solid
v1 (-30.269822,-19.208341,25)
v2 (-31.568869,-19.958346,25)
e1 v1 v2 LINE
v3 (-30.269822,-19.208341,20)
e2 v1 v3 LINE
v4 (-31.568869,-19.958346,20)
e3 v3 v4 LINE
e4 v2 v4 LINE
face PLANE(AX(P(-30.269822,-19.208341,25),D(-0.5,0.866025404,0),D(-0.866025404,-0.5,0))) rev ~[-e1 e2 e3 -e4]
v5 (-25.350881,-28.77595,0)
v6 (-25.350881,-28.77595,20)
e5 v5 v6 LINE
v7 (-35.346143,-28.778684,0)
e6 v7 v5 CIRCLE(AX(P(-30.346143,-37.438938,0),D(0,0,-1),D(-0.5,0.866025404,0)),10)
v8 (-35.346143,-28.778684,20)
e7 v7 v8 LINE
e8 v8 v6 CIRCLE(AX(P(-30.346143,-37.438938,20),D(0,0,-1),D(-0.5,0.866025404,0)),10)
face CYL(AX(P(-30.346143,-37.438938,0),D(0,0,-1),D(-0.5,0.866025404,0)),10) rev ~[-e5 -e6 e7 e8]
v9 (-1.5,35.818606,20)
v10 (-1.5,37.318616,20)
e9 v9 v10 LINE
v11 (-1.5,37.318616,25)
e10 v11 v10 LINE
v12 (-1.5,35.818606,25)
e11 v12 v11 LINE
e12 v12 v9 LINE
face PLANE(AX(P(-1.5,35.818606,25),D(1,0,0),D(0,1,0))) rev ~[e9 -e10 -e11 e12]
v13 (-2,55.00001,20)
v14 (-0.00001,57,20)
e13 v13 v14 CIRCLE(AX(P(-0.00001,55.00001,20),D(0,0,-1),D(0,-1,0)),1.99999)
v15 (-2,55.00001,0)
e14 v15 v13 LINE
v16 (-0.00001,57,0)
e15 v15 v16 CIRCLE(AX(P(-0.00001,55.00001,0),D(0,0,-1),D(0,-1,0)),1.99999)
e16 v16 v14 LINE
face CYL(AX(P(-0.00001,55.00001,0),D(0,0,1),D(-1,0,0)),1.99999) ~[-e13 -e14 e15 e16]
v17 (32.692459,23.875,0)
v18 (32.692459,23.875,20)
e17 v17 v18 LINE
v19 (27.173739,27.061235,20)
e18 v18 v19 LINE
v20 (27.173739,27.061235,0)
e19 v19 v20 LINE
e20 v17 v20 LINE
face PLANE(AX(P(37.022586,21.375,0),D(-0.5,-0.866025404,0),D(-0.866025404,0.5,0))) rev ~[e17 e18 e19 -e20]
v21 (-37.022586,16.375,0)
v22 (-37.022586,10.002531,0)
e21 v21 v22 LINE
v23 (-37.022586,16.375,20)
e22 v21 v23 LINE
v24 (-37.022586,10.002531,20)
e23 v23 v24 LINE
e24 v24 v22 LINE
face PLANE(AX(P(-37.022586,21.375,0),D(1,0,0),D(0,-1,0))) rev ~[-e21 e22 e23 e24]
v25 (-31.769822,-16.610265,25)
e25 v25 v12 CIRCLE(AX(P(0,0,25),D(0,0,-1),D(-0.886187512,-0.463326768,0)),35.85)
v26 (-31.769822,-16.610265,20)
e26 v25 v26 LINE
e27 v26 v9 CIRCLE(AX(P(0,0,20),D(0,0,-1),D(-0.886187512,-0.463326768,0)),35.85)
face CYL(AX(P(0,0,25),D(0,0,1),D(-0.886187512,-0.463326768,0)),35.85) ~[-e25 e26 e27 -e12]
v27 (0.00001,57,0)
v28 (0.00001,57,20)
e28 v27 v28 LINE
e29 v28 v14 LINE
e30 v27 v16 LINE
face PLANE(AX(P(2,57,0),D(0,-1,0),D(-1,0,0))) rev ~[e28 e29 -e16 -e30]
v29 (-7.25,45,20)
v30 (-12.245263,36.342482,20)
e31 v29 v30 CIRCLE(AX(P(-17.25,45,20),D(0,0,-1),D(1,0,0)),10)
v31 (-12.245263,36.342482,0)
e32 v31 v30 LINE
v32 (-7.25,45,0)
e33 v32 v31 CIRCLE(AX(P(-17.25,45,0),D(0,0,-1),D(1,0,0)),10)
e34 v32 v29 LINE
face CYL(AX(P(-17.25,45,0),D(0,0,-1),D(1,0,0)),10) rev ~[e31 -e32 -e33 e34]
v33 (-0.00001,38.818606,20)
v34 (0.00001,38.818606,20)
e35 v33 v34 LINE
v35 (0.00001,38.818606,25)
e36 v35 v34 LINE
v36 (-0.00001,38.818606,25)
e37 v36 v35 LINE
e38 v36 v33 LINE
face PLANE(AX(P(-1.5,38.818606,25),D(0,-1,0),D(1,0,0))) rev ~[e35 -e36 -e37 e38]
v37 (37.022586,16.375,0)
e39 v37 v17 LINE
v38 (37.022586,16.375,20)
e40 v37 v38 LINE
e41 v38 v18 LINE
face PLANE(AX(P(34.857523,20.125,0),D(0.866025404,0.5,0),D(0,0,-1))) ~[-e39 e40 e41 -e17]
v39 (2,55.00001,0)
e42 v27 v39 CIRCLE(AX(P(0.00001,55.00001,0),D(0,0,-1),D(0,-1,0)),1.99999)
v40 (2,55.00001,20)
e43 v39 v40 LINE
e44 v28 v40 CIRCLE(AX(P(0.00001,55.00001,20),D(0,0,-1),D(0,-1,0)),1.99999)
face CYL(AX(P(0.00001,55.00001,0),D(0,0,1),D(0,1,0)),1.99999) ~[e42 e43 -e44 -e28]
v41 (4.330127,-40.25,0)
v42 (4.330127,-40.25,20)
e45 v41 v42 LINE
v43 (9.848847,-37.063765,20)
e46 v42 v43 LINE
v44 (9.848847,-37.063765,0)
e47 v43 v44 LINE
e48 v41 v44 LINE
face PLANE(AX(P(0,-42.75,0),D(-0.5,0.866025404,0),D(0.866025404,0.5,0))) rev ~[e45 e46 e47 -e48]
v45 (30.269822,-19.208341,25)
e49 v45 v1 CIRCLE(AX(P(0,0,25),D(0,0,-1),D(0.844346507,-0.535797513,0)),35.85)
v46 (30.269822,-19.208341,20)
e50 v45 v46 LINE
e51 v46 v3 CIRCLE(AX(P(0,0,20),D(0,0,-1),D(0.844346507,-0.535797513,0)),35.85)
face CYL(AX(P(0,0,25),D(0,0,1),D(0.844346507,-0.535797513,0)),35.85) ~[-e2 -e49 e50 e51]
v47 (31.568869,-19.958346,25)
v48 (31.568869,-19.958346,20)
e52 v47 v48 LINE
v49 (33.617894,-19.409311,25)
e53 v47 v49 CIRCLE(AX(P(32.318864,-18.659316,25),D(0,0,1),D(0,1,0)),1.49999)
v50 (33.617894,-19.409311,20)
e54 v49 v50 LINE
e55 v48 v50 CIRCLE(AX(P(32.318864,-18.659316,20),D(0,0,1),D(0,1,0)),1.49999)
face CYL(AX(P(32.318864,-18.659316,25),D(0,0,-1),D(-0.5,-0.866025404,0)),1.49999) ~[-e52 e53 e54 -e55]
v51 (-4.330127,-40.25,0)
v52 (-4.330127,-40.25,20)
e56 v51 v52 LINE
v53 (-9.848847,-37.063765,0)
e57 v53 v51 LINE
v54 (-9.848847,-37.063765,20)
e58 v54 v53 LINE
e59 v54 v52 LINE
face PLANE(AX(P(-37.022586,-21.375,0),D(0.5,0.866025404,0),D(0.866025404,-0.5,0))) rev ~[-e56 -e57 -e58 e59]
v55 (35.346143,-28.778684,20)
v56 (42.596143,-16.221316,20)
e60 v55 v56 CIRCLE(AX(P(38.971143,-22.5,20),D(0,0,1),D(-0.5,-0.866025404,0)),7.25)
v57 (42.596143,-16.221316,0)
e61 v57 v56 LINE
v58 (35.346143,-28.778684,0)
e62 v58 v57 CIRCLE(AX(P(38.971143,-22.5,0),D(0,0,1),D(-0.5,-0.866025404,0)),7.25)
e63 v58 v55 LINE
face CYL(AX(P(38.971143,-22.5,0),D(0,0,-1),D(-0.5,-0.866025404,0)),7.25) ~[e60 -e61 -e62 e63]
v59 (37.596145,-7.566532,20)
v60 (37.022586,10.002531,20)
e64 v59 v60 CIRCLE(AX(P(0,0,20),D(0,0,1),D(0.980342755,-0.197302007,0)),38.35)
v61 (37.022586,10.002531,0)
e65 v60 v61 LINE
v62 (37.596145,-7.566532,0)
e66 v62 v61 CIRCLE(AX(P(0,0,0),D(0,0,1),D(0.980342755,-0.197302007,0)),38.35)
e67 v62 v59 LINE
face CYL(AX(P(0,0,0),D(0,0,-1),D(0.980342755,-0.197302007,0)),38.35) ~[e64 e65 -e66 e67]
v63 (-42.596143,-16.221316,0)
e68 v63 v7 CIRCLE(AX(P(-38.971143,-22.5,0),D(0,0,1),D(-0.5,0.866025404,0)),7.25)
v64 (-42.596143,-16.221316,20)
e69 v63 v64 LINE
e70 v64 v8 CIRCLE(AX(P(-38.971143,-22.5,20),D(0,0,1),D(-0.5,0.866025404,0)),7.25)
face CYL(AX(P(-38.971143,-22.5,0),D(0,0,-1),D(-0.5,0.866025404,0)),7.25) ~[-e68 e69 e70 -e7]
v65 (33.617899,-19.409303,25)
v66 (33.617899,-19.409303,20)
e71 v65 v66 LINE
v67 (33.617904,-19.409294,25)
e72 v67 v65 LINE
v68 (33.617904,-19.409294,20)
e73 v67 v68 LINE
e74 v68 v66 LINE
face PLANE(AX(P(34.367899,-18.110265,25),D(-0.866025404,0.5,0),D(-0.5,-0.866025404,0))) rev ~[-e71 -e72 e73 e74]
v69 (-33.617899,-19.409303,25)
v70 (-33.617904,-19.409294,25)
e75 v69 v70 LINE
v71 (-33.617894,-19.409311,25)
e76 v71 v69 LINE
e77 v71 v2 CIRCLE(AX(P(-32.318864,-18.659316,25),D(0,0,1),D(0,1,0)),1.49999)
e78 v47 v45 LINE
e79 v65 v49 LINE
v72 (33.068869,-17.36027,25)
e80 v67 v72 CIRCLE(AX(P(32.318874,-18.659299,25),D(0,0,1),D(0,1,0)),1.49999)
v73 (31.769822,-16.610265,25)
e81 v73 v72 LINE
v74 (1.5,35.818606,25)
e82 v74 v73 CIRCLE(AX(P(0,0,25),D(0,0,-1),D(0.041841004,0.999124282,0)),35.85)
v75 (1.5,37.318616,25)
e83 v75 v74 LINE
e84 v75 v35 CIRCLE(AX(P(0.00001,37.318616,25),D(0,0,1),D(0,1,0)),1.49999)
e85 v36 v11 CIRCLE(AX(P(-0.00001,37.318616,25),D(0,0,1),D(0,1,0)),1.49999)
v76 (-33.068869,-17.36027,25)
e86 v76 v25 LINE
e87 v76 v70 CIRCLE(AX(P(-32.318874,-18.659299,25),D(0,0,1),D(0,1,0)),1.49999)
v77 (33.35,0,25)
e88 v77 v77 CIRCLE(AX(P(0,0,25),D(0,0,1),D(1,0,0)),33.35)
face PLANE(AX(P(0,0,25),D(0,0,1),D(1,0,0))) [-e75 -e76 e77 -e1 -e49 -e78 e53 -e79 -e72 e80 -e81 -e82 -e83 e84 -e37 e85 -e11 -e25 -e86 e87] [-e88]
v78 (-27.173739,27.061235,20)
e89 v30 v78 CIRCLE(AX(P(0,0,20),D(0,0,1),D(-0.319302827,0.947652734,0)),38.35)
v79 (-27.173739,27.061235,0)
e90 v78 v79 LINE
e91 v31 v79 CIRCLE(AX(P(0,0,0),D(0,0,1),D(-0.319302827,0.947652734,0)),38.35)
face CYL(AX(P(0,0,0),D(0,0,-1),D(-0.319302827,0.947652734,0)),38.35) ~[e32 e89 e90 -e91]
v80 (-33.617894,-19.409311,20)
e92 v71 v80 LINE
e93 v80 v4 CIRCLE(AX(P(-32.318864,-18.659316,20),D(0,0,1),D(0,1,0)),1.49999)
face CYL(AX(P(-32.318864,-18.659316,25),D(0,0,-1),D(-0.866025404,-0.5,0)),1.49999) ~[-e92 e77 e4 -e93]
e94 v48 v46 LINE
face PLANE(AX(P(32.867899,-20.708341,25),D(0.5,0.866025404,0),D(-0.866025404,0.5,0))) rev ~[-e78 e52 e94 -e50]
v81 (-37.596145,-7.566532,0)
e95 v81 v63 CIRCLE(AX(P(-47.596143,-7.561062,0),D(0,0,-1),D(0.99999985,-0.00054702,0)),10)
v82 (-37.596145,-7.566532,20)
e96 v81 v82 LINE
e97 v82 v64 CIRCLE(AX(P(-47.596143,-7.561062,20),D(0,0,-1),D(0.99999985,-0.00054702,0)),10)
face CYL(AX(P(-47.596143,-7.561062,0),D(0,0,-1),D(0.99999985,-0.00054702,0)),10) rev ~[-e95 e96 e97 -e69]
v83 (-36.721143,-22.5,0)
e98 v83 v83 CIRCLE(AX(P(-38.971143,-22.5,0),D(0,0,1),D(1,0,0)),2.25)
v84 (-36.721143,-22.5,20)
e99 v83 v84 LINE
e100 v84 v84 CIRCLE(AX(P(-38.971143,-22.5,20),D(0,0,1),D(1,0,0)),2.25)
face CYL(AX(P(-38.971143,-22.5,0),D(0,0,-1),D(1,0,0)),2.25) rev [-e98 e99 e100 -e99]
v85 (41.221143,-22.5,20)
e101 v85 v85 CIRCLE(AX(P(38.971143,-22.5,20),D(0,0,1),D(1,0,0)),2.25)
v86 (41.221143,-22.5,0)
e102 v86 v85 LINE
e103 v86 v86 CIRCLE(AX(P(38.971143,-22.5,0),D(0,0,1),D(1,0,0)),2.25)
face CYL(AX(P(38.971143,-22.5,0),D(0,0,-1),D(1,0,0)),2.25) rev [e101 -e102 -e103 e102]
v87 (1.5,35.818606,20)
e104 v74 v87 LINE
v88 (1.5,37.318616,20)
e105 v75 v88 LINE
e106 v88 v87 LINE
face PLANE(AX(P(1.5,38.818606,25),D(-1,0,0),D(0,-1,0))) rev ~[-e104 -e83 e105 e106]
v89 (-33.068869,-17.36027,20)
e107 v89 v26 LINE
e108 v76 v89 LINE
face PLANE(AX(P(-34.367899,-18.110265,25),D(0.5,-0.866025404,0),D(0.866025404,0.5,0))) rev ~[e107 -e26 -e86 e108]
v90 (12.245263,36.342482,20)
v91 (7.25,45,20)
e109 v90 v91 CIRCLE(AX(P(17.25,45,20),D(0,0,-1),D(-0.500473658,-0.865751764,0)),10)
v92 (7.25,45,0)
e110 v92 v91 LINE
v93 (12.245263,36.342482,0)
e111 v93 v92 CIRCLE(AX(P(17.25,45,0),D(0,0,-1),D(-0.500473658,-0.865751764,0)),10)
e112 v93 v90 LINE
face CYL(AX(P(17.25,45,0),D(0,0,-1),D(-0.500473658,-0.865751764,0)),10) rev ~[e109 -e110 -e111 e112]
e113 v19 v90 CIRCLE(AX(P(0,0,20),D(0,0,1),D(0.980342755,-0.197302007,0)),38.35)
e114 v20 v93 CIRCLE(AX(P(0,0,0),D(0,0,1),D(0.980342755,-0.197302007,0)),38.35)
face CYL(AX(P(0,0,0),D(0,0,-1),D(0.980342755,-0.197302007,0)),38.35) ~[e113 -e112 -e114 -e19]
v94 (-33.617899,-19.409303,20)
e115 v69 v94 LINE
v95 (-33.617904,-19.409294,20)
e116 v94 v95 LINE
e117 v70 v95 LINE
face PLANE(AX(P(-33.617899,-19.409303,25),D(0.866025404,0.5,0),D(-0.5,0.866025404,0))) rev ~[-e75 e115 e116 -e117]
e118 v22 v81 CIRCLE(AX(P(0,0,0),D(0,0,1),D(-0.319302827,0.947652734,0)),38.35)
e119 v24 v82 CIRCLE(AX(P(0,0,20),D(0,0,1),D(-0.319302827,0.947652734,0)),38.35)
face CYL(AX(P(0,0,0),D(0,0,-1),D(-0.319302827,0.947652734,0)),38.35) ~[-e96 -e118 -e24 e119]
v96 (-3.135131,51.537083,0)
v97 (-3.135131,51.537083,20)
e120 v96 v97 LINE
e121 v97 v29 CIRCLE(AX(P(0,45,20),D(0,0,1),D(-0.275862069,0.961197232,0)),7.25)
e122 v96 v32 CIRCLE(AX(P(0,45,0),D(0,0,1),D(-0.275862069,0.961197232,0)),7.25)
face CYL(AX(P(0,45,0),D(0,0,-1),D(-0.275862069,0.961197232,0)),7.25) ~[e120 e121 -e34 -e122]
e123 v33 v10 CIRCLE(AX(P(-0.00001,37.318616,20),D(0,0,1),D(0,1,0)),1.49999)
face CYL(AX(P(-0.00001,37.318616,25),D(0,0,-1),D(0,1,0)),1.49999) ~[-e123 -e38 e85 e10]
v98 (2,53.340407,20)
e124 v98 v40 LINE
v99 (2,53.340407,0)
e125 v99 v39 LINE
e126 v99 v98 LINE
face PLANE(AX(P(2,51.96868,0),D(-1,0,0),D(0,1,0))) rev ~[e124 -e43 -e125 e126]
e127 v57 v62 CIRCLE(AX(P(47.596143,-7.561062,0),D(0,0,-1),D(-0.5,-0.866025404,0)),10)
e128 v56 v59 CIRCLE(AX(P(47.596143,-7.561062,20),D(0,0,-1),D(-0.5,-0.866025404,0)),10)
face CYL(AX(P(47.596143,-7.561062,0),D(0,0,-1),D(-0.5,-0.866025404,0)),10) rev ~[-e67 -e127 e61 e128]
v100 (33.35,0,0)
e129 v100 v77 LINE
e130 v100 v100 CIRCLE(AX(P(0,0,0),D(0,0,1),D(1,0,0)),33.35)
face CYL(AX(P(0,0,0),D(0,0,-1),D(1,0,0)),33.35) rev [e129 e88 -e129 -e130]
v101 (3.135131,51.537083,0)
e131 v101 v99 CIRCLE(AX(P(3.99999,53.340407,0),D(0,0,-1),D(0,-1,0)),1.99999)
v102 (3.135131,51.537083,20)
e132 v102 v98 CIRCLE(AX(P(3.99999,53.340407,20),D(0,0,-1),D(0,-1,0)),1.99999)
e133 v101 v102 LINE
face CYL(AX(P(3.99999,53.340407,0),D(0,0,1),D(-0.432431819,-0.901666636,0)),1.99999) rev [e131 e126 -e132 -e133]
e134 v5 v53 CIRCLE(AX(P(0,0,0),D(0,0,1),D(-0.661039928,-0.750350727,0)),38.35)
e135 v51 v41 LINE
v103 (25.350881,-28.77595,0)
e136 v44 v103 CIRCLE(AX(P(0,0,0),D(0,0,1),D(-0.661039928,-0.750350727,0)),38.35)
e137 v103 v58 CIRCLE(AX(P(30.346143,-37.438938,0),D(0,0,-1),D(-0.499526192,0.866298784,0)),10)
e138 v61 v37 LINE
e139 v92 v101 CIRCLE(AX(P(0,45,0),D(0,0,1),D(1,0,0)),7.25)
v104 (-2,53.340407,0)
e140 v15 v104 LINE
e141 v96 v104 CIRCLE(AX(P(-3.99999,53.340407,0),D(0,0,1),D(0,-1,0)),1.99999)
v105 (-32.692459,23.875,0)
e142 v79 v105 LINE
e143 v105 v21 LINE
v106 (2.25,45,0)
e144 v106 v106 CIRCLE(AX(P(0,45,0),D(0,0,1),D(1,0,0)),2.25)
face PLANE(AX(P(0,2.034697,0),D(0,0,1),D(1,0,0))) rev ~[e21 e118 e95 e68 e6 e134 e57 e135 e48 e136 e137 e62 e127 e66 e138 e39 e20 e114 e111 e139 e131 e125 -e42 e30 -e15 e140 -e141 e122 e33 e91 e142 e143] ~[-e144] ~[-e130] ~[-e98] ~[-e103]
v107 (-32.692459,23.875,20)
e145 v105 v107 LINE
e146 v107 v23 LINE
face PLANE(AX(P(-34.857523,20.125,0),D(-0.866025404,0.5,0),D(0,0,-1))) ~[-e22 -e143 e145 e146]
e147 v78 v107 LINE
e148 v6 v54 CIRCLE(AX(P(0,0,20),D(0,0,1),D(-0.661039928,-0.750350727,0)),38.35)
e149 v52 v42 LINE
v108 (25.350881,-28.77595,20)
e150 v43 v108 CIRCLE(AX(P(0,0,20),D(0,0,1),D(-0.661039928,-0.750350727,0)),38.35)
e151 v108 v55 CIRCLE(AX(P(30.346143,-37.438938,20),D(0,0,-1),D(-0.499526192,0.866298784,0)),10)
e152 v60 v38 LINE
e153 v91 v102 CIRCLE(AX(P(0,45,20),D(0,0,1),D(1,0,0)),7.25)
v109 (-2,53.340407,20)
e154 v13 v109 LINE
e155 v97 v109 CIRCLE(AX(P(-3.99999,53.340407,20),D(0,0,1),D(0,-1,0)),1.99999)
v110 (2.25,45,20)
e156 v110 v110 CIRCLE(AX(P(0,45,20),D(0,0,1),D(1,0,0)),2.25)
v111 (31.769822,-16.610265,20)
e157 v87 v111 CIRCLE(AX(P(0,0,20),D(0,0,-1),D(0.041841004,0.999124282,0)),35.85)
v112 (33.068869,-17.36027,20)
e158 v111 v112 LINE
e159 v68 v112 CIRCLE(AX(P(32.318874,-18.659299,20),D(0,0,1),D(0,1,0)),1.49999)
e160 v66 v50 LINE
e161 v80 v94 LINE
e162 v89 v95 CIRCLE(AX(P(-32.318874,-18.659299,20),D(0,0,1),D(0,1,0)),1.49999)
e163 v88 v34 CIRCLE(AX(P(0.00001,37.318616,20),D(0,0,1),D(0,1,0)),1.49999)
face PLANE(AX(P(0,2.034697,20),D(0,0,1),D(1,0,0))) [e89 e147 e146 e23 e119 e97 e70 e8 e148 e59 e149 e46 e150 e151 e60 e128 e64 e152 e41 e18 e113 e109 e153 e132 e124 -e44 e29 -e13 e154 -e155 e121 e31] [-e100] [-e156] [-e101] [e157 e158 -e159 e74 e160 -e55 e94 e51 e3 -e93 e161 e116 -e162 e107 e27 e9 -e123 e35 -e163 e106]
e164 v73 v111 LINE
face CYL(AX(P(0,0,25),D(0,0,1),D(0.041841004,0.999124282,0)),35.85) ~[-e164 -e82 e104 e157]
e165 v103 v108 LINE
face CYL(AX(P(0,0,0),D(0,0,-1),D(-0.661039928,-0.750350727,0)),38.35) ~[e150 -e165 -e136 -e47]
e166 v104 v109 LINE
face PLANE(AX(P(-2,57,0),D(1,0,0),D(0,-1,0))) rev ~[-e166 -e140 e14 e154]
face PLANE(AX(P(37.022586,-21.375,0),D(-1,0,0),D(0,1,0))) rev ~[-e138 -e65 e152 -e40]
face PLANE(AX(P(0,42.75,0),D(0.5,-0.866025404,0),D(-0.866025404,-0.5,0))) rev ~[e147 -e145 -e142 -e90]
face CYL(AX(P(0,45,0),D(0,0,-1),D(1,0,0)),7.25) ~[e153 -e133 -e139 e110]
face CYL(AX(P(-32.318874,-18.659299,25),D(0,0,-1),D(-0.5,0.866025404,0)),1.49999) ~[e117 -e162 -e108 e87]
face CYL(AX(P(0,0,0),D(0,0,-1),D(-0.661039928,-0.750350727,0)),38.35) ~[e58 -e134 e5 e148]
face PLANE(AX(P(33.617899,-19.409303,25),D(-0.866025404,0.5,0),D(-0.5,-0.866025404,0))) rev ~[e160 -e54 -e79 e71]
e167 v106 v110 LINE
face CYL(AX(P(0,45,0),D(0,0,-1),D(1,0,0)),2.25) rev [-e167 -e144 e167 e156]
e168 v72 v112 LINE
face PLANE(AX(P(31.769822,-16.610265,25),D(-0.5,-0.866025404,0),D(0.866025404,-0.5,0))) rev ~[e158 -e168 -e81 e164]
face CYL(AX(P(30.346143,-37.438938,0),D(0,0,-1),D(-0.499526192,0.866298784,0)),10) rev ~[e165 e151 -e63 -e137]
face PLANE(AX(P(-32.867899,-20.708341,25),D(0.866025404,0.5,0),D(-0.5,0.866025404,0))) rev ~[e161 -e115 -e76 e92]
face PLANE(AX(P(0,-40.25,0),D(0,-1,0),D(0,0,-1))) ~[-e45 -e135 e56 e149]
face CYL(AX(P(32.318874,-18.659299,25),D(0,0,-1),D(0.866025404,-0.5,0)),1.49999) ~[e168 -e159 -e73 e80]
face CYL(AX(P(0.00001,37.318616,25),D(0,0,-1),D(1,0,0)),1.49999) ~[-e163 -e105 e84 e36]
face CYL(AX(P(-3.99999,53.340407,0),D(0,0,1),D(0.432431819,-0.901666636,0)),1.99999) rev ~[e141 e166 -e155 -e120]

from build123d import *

# Parameters (mm, degrees)
F0_R     = 2.25
F0_R_2   = 33.35
F1_DEPTH = 20
F2_R     = 33.35
F3_DEPTH = 25
F5_DEPTH = 5
F6_R     = 1.49999
F7_SIZE  = 5
F8_R     = 1.99999


# Not quite as in the source:
# - a fillet or chamfer is up to 0.001 mm smaller than in the source, because OpenCascade refuses the exact size


with BuildPart() as f1:
    # F0 (on Top) → F1 (new body)
    with BuildSketch(Plane.XY):
        with BuildLine():
            ThreePointArc((-35.3461431703, -28.7786841774), (-30.3488782685, -27.4389385893), (-25.3508812473, -28.775950375))
            ThreePointArc((-25.3508812473, -28.775950375), (0, -38.35), (25.3508812473, -28.775950375))
            ThreePointArc((25.3508812473, -28.775950375), (30.3488782685, -27.4389385893), (35.3461431703, -28.7786841774))
            ThreePointArc((35.3461431703, -28.7786841774), (45.2498273477, -26.125), (42.5961431703, -16.2213158226))
            ThreePointArc((42.5961431703, -16.2213158226), (38.9372570055, -12.5634302623), (37.5961446665, -7.566531981))
            ThreePointArc((37.5961446665, -7.566531981), (33.2120742351, 19.175), (12.2452634191, 36.342482356))
            ThreePointArc((12.2452634191, 36.342482356), (8.588378737, 40.0023688516), (7.25, 45))
            ThreePointArc((7.25, 45), (5.790617411, 49.3624820917), (2, 51.9686799324))
            Line((2, 51.9686799324), (2, 54.1277186767))
            Line((2, 54.1277186767), (2, 57))
            Line((2, 57), (0, 57))
            Line((0, 57), (-2, 57))
            Line((-2, 57), (-2, 54.1277186767))
            Line((-2, 54.1277186767), (-2, 51.9686799324))
            ThreePointArc((-2, 51.9686799324), (-5.790617411, 49.3624820917), (-7.25, 45))
            ThreePointArc((-7.25, 45), (-8.588378737, 40.0023688516), (-12.2452634191, 36.342482356))
            ThreePointArc((-12.2452634191, 36.342482356), (-33.2120742351, 19.175), (-37.5961446665, -7.566531981))
            ThreePointArc((-37.5961446665, -7.566531981), (-38.9372570055, -12.5634302623), (-42.5961431703, -16.2213158226))
            ThreePointArc((-42.5961431703, -16.2213158226), (-45.2498273477, -26.125), (-35.3461431703, -28.7786841774))
        make_face()
        with Locations((-38.9711431703, -22.5)):
            Circle(F0_R, mode=Mode.SUBTRACT)
        with Locations((38.9711431703, -22.5)):
            Circle(F0_R, mode=Mode.SUBTRACT)
        Circle(F0_R_2, mode=Mode.SUBTRACT)
        with Locations((0, 45)):
            Circle(F0_R, mode=Mode.SUBTRACT)
    extrude(amount=F1_DEPTH)

    # F2 (on Top) → F3 (join)
    with BuildSketch(Plane.XY):
        Polygon((37.0225860118, -21.375), (37.0225860118, 21.375), (0, 42.75), (-37.0225860118, 21.375), (-37.0225860118, -21.375), (0, -42.75), align=None)
        Circle(F2_R, mode=Mode.SUBTRACT)
    extrude(amount=F3_DEPTH)

    # F4 (on face) → F5 (cut)
    with BuildSketch(Plane.XY.offset(25)):
        Polygon((37.0225860118, -21.375), (37.0225860118, 21.375), (0, 42.75), (-37.0225860118, 21.375), (-37.0225860118, -21.375), (0, -42.75), align=None)
        with BuildLine():
            ThreePointArc((-31.7698222916, -16.6102646446), (-31.0470107257, 17.925), (-1.5, 35.8186055005))
            Line((-1.5, 35.8186055005), (-1.5, 38.8186055005))
            Line((-1.5, 38.8186055005), (0, 38.8186055005))
            Line((0, 38.8186055005), (1.5, 38.8186055005))
            Line((1.5, 38.8186055005), (1.5, 35.8186055005))
            ThreePointArc((1.5, 35.8186055005), (31.0470107257, 17.925), (31.7698222916, -16.6102646446))
            Line((31.7698222916, -16.6102646446), (34.3678985029, -18.1102646446))
            Line((34.3678985029, -18.1102646446), (33.6178985029, -19.4093027502))
            Line((33.6178985029, -19.4093027502), (32.8678985029, -20.7083408559))
            Line((32.8678985029, -20.7083408559), (30.2698222916, -19.2083408559))
            ThreePointArc((30.2698222916, -19.2083408559), (0, -35.85), (-30.2698222916, -19.2083408559))
            Line((-30.2698222916, -19.2083408559), (-32.8678985029, -20.7083408559))
            Line((-32.8678985029, -20.7083408559), (-33.6178985029, -19.4093027502))
            Line((-33.6178985029, -19.4093027502), (-34.3678985029, -18.1102646446))
            Line((-34.3678985029, -18.1102646446), (-31.7698222916, -16.6102646446))
        make_face(mode=Mode.SUBTRACT)
    extrude(amount=-F5_DEPTH, mode=Mode.SUBTRACT)

    # F6 (radius 1.5 in the source; OpenCascade refuses exactly that, so slightly less here)
    f6_edges = [f1.edges().sort_by_distance(p)[0] for p in [
        (-32.867899, -20.708341, 22.5),
        (-34.367899, -18.110265, 22.5),
        (32.867899, -20.708341, 22.5),
        (34.367899, -18.110265, 22.5),
        (1.5, 38.818606, 22.5),
        (-1.5, 38.818606, 22.5),
    ]]
    fillet(f6_edges, radius=F6_R)

    # F7
    f7_edges = [f1.edges().sort_by_distance(p)[0] for p in [
        (0, -42.75, 10),
        (37.022586, 21.375, 10),
        (-37.022586, 21.375, 10),
    ]]
    chamfer(f7_edges, length=F7_SIZE)

    # F8 (radius 2 in the source; OpenCascade refuses exactly that, so slightly less here)
    f8_edges = [f1.edges().sort_by_distance(p)[0] for p in [
        (-2, 57, 10),
        (2, 57, 10),
        (-2, 51.96868, 10),
        (2, 51.96868, 10),
    ]]
    fillet(f8_edges, radius=F8_R)


solid = f1.part
